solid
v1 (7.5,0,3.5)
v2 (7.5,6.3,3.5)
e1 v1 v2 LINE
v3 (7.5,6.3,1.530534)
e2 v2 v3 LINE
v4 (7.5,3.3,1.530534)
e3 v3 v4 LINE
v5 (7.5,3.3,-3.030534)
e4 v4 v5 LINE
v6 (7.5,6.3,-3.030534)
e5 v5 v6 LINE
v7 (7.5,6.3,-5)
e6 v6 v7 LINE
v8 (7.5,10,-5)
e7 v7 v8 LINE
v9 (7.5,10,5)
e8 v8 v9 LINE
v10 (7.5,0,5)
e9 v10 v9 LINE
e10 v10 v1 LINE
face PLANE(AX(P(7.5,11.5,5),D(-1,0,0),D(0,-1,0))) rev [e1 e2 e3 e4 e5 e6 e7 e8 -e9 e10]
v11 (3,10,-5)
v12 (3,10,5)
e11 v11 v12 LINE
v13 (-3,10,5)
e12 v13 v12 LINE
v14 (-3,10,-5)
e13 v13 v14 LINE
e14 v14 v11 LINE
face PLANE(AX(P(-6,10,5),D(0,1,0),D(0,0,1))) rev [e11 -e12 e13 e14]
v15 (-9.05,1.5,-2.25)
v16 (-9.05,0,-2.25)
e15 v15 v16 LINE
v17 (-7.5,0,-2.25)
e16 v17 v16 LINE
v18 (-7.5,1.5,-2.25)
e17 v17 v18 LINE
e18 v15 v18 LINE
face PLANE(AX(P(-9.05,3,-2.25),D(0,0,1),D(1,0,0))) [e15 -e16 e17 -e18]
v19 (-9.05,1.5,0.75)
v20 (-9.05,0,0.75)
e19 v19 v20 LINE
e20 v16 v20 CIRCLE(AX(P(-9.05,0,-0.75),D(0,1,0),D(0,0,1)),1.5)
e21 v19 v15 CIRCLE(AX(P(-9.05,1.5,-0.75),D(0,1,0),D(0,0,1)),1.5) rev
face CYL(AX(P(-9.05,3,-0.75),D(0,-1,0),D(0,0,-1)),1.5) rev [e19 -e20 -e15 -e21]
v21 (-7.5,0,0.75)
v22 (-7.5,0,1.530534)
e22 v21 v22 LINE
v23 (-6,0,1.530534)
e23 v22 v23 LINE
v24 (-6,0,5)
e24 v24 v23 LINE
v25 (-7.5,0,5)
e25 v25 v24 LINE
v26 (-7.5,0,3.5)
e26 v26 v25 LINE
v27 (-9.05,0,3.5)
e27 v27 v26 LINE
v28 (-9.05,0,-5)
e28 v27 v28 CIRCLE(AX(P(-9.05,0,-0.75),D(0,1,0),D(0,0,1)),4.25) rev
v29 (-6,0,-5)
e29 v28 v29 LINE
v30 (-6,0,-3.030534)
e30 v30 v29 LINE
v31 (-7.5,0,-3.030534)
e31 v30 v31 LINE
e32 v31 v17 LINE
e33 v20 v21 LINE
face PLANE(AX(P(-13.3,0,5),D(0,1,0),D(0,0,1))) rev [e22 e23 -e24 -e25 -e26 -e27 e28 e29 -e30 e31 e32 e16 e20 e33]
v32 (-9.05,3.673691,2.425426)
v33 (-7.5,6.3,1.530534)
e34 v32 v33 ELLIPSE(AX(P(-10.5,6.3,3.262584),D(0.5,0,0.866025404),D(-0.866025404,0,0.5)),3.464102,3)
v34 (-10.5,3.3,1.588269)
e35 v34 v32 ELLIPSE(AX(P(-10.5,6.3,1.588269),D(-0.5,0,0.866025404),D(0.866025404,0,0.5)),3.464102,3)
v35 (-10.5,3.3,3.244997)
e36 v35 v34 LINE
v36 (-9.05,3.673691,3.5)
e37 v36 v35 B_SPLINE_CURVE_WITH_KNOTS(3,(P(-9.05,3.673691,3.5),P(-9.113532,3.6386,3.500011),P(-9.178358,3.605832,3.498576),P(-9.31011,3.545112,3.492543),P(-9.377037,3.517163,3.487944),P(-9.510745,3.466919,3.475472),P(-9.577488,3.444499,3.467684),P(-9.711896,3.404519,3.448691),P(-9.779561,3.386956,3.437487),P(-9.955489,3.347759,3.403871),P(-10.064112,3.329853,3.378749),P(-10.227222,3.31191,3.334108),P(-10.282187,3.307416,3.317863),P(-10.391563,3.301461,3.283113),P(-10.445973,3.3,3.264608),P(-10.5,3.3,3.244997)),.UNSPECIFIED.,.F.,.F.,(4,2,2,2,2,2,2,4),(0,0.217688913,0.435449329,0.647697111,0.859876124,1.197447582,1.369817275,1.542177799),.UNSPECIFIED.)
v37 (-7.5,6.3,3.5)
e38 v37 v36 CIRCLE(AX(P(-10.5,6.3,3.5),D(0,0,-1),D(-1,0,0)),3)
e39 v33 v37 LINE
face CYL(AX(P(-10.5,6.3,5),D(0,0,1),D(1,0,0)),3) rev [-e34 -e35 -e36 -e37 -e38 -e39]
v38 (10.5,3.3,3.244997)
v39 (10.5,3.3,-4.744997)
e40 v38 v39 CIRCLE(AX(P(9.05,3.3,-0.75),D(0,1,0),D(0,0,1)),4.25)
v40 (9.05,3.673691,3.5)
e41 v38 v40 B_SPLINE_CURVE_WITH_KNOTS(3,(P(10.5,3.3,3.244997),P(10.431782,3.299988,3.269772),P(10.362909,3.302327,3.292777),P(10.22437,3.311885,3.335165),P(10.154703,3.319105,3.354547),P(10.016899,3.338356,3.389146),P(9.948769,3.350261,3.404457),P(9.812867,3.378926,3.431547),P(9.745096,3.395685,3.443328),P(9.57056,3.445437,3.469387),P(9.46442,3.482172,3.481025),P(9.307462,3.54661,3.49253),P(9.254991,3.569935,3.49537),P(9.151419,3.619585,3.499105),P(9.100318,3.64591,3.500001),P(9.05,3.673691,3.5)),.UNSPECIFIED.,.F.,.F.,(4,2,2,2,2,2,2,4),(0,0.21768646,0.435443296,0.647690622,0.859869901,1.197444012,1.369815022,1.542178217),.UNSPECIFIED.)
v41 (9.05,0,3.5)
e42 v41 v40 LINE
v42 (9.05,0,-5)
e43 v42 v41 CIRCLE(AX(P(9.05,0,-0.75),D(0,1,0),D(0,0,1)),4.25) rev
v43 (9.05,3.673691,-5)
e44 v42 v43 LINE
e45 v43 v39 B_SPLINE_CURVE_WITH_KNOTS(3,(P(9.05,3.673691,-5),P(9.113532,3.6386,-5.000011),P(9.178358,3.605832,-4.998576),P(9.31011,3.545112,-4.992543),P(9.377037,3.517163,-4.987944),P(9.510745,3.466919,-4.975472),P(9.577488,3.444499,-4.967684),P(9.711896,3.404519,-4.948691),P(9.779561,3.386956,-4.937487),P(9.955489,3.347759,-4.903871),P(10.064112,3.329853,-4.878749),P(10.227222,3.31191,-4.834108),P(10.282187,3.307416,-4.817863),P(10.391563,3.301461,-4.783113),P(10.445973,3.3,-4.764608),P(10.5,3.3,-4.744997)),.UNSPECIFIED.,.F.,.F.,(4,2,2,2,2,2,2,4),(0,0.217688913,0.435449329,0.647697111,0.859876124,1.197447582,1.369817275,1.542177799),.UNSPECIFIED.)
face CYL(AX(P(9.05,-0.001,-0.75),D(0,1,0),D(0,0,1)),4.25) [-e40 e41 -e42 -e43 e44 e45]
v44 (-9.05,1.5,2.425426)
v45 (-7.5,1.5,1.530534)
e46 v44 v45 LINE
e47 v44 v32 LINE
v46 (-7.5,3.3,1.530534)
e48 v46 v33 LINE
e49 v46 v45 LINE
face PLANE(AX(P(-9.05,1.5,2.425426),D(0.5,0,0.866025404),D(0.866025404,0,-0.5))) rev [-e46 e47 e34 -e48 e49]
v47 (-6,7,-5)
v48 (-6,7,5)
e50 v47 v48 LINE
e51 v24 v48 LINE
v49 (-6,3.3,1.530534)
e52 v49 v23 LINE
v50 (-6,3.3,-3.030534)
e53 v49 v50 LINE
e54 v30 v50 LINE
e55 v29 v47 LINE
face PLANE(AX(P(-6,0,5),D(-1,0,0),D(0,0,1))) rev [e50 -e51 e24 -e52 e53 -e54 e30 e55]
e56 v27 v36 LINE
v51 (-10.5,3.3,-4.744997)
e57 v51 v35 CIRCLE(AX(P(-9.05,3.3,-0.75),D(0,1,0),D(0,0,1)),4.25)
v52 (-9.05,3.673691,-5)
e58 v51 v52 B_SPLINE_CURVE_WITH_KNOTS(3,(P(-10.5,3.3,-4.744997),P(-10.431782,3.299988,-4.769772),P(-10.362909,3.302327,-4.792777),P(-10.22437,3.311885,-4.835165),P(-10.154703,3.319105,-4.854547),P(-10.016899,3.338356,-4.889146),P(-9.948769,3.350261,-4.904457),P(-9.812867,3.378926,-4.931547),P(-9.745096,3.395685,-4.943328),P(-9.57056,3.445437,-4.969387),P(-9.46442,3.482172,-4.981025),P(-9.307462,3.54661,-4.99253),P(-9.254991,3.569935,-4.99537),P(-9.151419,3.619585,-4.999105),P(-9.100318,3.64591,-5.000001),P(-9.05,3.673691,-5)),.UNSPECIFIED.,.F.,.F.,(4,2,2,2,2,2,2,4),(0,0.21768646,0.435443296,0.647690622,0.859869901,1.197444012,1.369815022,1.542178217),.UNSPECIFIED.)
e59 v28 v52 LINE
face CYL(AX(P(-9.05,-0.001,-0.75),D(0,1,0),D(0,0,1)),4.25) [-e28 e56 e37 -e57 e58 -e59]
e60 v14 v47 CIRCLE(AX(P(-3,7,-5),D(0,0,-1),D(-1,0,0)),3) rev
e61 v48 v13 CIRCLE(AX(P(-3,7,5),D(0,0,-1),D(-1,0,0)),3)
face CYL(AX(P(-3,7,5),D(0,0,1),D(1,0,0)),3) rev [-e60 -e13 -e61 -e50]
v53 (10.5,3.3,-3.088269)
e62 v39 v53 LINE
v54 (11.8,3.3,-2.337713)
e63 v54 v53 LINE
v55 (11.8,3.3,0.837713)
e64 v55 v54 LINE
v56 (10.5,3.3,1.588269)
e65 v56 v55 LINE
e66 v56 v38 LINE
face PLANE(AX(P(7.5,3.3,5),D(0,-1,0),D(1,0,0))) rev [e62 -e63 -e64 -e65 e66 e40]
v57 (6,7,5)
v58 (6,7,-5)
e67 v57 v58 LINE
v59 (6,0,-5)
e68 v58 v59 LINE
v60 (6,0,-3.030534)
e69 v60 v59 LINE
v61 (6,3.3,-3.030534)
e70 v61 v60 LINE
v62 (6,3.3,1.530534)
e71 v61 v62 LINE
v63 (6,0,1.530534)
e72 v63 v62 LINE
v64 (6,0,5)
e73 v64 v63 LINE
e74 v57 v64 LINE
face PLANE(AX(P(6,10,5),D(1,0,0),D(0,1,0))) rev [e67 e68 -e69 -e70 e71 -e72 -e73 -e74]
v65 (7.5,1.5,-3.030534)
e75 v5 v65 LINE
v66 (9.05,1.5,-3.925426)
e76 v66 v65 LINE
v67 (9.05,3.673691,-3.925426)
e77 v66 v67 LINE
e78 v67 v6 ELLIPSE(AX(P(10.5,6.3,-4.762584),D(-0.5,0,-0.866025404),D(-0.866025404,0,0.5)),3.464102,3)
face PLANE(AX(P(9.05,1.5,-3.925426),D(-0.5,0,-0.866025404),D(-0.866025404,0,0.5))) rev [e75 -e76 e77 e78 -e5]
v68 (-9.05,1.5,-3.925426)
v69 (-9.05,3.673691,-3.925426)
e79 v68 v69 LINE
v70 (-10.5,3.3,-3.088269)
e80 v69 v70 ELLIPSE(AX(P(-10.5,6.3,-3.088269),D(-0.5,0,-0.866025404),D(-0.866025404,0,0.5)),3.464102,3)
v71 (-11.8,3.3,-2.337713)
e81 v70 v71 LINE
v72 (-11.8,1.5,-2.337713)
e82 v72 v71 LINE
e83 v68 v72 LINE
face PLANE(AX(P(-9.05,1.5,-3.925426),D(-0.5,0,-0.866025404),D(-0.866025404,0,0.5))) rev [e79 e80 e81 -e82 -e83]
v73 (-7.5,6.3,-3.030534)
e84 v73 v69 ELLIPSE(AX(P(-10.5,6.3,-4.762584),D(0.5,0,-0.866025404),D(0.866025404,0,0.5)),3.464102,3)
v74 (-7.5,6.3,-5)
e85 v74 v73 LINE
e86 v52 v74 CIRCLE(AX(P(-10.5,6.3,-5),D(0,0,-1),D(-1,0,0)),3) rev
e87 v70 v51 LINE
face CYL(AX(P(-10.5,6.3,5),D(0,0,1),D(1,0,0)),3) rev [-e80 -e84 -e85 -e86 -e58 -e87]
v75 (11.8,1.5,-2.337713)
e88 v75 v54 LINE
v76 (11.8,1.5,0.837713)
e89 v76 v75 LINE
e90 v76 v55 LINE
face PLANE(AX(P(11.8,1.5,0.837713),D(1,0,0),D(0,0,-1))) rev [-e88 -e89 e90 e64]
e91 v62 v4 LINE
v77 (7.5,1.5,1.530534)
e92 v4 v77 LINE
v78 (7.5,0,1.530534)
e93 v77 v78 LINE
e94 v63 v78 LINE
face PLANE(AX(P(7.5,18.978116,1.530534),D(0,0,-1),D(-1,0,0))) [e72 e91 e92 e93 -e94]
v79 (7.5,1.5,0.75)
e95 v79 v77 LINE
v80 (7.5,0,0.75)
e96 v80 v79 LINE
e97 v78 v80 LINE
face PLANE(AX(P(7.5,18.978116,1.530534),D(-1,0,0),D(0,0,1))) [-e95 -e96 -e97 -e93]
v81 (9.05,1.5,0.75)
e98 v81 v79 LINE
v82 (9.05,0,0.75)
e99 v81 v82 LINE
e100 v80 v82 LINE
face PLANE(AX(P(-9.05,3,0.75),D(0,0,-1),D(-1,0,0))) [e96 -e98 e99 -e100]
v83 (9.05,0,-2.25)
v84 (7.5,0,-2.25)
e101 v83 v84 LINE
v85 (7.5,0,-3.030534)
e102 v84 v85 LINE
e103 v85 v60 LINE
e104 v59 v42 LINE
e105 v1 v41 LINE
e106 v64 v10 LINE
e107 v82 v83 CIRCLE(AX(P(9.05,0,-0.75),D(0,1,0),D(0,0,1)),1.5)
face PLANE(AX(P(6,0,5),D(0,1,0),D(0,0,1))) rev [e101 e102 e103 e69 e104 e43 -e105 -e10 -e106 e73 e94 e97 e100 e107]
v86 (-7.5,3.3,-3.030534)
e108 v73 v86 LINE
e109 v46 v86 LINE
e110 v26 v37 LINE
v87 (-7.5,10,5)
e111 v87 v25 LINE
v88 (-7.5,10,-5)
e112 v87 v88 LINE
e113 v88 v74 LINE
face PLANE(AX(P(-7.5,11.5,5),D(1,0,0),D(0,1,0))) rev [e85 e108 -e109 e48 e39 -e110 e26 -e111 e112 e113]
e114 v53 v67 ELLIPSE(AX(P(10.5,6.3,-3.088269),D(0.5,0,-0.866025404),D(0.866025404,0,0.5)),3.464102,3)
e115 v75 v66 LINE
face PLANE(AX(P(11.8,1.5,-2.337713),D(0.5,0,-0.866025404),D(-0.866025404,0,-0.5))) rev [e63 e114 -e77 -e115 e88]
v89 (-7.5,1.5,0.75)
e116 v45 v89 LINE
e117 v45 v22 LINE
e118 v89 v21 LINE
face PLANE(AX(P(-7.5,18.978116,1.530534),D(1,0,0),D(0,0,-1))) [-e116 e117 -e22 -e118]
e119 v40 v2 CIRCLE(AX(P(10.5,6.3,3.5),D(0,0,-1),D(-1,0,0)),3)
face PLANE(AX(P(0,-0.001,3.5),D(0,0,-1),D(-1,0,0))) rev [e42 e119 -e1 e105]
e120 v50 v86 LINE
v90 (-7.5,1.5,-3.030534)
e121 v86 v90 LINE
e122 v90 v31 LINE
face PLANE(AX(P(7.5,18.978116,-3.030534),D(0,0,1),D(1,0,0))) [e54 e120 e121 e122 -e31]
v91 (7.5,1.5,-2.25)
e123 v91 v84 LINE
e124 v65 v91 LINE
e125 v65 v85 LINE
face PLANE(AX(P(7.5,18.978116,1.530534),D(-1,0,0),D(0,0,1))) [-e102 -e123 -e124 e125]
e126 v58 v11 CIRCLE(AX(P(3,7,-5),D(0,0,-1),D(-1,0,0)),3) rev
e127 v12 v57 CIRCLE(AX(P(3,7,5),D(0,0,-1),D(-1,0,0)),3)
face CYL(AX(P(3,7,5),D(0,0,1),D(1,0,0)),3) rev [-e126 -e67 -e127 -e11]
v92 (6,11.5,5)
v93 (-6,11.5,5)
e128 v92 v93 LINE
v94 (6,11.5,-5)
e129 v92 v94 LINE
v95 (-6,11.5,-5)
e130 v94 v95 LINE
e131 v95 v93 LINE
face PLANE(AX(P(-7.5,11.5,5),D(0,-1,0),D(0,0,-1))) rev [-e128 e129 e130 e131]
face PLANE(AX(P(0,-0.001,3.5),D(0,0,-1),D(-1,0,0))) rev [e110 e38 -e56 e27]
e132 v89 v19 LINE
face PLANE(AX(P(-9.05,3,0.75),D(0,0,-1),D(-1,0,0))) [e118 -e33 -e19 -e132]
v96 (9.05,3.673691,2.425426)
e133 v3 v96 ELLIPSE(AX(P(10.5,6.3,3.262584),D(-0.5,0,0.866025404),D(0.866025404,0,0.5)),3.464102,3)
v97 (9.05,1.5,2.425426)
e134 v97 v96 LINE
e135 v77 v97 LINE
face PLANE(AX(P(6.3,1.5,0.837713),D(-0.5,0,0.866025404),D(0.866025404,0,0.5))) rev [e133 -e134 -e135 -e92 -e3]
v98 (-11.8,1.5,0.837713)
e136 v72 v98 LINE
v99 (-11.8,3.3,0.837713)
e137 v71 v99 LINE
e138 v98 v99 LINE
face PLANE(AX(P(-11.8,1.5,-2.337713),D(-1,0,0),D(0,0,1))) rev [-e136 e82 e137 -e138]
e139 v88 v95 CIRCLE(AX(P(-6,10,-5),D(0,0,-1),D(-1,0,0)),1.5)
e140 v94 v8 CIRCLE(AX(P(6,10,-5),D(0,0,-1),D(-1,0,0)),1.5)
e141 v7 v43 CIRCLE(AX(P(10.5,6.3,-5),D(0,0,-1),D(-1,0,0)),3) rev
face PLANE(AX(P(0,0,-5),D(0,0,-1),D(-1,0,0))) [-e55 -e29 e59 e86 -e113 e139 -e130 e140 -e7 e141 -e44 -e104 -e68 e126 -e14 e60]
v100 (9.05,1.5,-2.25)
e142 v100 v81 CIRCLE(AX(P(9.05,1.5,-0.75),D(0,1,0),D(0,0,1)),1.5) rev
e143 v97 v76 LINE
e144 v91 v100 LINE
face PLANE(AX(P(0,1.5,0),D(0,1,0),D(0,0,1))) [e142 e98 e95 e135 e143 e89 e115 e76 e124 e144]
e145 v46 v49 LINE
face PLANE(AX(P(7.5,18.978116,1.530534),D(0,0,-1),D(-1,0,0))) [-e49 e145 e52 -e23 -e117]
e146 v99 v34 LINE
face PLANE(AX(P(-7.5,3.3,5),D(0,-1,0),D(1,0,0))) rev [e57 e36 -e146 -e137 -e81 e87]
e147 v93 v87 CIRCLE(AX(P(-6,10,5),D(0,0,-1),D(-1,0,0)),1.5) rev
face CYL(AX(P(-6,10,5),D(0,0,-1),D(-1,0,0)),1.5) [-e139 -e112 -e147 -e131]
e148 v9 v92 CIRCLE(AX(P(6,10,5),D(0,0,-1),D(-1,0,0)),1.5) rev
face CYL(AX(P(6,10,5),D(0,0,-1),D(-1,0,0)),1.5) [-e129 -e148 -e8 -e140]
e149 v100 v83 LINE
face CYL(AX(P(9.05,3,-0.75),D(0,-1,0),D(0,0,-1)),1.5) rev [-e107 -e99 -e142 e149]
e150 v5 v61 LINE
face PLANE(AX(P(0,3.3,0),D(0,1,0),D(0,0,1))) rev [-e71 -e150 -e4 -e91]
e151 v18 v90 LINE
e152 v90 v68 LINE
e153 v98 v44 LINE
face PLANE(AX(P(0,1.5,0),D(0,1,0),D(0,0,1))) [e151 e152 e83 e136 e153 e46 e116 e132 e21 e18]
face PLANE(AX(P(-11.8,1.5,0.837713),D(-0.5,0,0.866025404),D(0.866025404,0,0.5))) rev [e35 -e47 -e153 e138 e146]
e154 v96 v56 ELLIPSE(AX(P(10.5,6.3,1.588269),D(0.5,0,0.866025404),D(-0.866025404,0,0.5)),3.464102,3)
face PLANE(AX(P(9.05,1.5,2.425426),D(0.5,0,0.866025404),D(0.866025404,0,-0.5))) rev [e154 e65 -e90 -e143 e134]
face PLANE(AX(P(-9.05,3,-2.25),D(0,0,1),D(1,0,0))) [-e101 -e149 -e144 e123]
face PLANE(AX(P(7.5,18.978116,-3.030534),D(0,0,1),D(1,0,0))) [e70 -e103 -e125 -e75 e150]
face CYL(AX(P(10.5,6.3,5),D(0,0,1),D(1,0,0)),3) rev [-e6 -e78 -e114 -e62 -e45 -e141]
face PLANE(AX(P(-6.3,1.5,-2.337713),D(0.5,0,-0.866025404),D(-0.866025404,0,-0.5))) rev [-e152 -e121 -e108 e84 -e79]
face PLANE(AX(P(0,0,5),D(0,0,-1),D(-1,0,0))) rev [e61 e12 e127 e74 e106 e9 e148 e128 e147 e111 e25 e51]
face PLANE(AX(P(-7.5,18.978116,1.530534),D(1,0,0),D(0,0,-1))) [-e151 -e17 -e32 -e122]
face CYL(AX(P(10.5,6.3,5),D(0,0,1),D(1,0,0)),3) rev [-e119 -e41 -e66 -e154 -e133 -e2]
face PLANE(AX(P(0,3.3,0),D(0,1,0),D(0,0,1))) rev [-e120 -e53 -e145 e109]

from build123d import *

# Parameters (mm, degrees)
BOSS_EXTRUDE1_DEPTH = 5
CUT_EXTRUDE1_REACH  = 18.405
CUT_EXTRUDE2_DEPTH  = 1.8
FILLET1_START       = -5
FILLET1_DEPTH       = 10
FILLET1_2_DEPTH     = 1.969466537
FILLET1_START_2     = 1.530533463
FILLET1_3_DEPTH     = 1.969466537
FILLET1_START_3     = 3.3
FILLET1_4_DEPTH     = 3.7
FILLET2_R           = 1.5
CUT_EXTRUDE3_DEPTH  = 3
CUT_EXTRUDE4_REACH  = 20.279
SKETCH5_W           = 15
SKETCH5_H           = 4.561067126


with BuildPart() as part:
    # Sketch1 → Boss-Extrude1 (new, symmetric)
    with BuildSketch(Plane.XY):
        Polygon((-7.5, 11.5), (7.5, 11.5), (7.5, 3.3), (13.3, 3.3), (13.3, 0), (6, 0), (6, 10), (-6, 10), (-6, 0), (-13.3, 0), (-13.3, 3.3), (-7.5, 3.3), align=None)
    extrude(amount=BOSS_EXTRUDE1_DEPTH, both=True)

    # Sketch2 → Cut-Extrude1 (cut, up to next)
    with BuildSketch(Plane(origin=(0, 3.3, 0), x_dir=(1, 0, 0), z_dir=(0, 1, 0)), mode=Mode.PRIVATE) as cut_extrude1_sk1:
        with BuildLine():
            ThreePointArc((-9.05, -3.5), (-12.05520382, -2.25520382), (-13.3, 0.75))
            Line((-13.3, 0.75), (-13.3, -5))
            Line((-13.3, -5), (-7.5, -5))
            Line((-7.5, -5), (-7.5, -3.5))
            Line((-7.5, -3.5), (-9.05, -3.5))
        make_face()
    cut_extrude1_tool1 = extrude(cut_extrude1_sk1.sketch, amount=-CUT_EXTRUDE1_REACH, mode=Mode.PRIVATE) & part.part
    # Sketch2 → Cut-Extrude1 (cut, up to next)
    with BuildSketch(Plane(origin=(0, 3.3, 0), x_dir=(1, 0, 0), z_dir=(0, 1, 0)), mode=Mode.PRIVATE) as cut_extrude1_sk2:
        with BuildLine():
            ThreePointArc((-13.3, 0.75), (-12.05520382, 3.75520382), (-9.05, 5))
            Line((-9.05, 5), (-13.3, 5))
            Line((-13.3, 5), (-13.3, 0.75))
        make_face()
    cut_extrude1_tool2 = extrude(cut_extrude1_sk2.sketch, amount=-CUT_EXTRUDE1_REACH, mode=Mode.PRIVATE) & part.part
    # Sketch2 → Cut-Extrude1 (cut, up to next)
    with BuildSketch(Plane(origin=(0, 3.3, 0), x_dir=(1, 0, 0), z_dir=(0, 1, 0)), mode=Mode.PRIVATE) as cut_extrude1_sk3:
        with BuildLine():
            ThreePointArc((9.05, 5), (12.05520382, 3.75520382), (13.3, 0.75))
            Line((13.3, 0.75), (13.3, 5))
            Line((13.3, 5), (9.05, 5))
        make_face()
    cut_extrude1_tool3 = extrude(cut_extrude1_sk3.sketch, amount=-CUT_EXTRUDE1_REACH, mode=Mode.PRIVATE) & part.part
    # Sketch2 → Cut-Extrude1 (cut, up to next)
    with BuildSketch(Plane(origin=(0, 3.3, 0), x_dir=(1, 0, 0), z_dir=(0, 1, 0)), mode=Mode.PRIVATE) as cut_extrude1_sk4:
        with BuildLine():
            ThreePointArc((13.3, 0.75), (12.05520382, -2.25520382), (9.05, -3.5))
            Line((9.05, -3.5), (7.5, -3.5))
            Line((7.5, -3.5), (7.5, -5))
            Line((7.5, -5), (13.3, -5))
            Line((13.3, -5), (13.3, 0.75))
        make_face()
    cut_extrude1_tool4 = extrude(cut_extrude1_sk4.sketch, amount=-CUT_EXTRUDE1_REACH, mode=Mode.PRIVATE) & part.part
    add(cut_extrude1_tool1.solids().sort_by_distance((-11.00124, 3.3, 3.726238))[0], mode=Mode.SUBTRACT)
    add(cut_extrude1_tool2.solids().sort_by_distance((-12.350686, 3.3, -4.050686))[0], mode=Mode.SUBTRACT)
    add(cut_extrude1_tool3.solids().sort_by_distance((12.350686, 3.3, -4.050686))[0], mode=Mode.SUBTRACT)
    add(cut_extrude1_tool4.solids().sort_by_distance((11.00124, 3.3, 3.726238))[0], mode=Mode.SUBTRACT)

    # Sketch3 → Cut-Extrude2 (cut)
    with BuildSketch(Plane(origin=(0, 3.3, 0), x_dir=(1, 0, 0), z_dir=(0, 1, 0))):
        Polygon((-9.05, 3.925426481), (-11.8, 2.33771324), (-11.8, -0.83771324), (-9.05, -2.425426481), (-6.3, -0.83771324), (-6.3, 2.33771324), align=None)
        Polygon((9.05, 3.925426481), (6.3, 2.33771324), (6.3, -0.83771324), (9.05, -2.425426481), (11.8, -0.83771324), (11.8, 2.33771324), align=None)
    extrude(amount=-CUT_EXTRUDE2_DEPTH, mode=Mode.SUBTRACT)

    # Fillet1: read off the stored shape, not the designer's step
    # Fillet1 outline → Fillet1 (add)
    with BuildSketch(Plane.XY.offset(FILLET1_START)):
        with BuildLine():
            ThreePointArc((-6, 7), (-5.121320344, 9.121320344), (-3, 10))
            Line((-3, 10), (-6, 10))
            Line((-6, 10), (-6, 7))
        make_face()
        with BuildLine():
            ThreePointArc((3, 10), (5.121320344, 9.121320344), (6, 7))
            Line((6, 7), (6, 10))
            Line((6, 10), (3, 10))
        make_face()
    extrude(amount=FILLET1_DEPTH)

    # Fillet1 2 outline → Fillet1 2 (add)
    with BuildSketch(Plane.XY.offset(FILLET1_START)):
        with BuildLine():
            ThreePointArc((-7.5, 6.3), (-8.378679656, 4.178679656), (-10.5, 3.3))
            Line((-10.5, 3.3), (-7.5, 3.3))
            Line((-7.5, 3.3), (-7.5, 6.3))
        make_face()
        with BuildLine():
            ThreePointArc((10.5, 3.3), (8.378679656, 4.178679656), (7.5, 6.3))
            Line((7.5, 6.3), (7.5, 3.3))
            Line((7.5, 3.3), (10.5, 3.3))
        make_face()
    extrude(amount=FILLET1_2_DEPTH)

    # Fillet1 3 outline → Fillet1 3 (add)
    with BuildSketch(Plane.XY.offset(FILLET1_START_2)):
        with BuildLine():
            ThreePointArc((-7.5, 6.3), (-8.378679656, 4.178679656), (-10.5, 3.3))
            Line((-10.5, 3.3), (-7.5, 3.3))
            Line((-7.5, 3.3), (-7.5, 6.3))
        make_face()
        with BuildLine():
            ThreePointArc((10.5, 3.3), (8.378679656, 4.178679656), (7.5, 6.3))
            Line((7.5, 6.3), (7.5, 3.3))
            Line((7.5, 3.3), (10.5, 3.3))
        make_face()
    extrude(amount=FILLET1_3_DEPTH)

    # Fillet1 4 outline → Fillet1 4 (cut)
    with BuildSketch(Plane(origin=(0, 0, 0), x_dir=(1, 0, 0), z_dir=(0, 1, 0)).offset(FILLET1_START_3)):
        with BuildLine():
            ThreePointArc((10.5, -3.244996871), (9.786126109, -3.435763772), (9.05, -3.5))
            Line((9.05, -3.5), (10.5, -3.5))
            Line((10.5, -3.5), (10.5, -3.244996871))
        make_face()
        Polygon((9.05, 3.925426481), (7.5, 3.030533563), (10.5, 3.030533463), (10.5, 3.08826859), align=None)
        Polygon((10.5, -1.530533463), (7.5, -1.530533463), (9.05, -2.425426481), (10.5, -1.58826859), align=None)
        with BuildLine():
            Line((10.5, 5), (9.05, 5))
            ThreePointArc((9.05, 5), (9.786126109, 4.935763772), (10.5, 4.744996871))
            Line((10.5, 4.744996871), (10.5, 5))
        make_face()
        with BuildLine():
            ThreePointArc((-9.05, -3.5), (-9.786126109, -3.435763772), (-10.5, -3.244996871))
            Line((-10.5, -3.244996871), (-10.5, -3.5))
            Line((-10.5, -3.5), (-9.05, -3.5))
        make_face()
        Polygon((-9.05, 3.925426481), (-10.5, 3.08826859), (-10.5, 3.030533463), (-7.5, 3.030533463), align=None)
        Polygon((-7.5, -1.530533463), (-10.5, -1.530533463), (-10.5, -1.58826859), (-9.05, -2.425426481), align=None)
        with BuildLine():
            Line((-9.05, 5), (-10.5, 5))
            Line((-10.5, 5), (-10.5, 4.744996871))
            ThreePointArc((-10.5, 4.744996871), (-9.786126109, 4.935763772), (-9.05, 5))
        make_face()
    extrude(amount=FILLET1_4_DEPTH, mode=Mode.SUBTRACT)

    # Fillet2
    fillet2_edges = [part.edges().sort_by_distance(p)[0] for p in [
        (-7.5, 11.5, 0),
        (7.5, 11.5, 0),
    ]]
    fillet(fillet2_edges, radius=FILLET2_R)

    # Sketch4 → Cut-Extrude3 (cut)
    with BuildSketch(Plane(origin=(0, 0, 0), x_dir=(1, 0, 0), z_dir=(0, 1, 0))):
        with BuildLine():
            Line((-9.05, -0.75), (9.05, -0.75))
            ThreePointArc((9.05, -0.75), (10.55, 0.75), (9.05, 2.25))
            Line((9.05, 2.25), (-9.05, 2.25))
            ThreePointArc((-9.05, 2.25), (-10.55, 0.75), (-9.05, -0.75))
        make_face()
    extrude(amount=CUT_EXTRUDE3_DEPTH, mode=Mode.SUBTRACT)

    # Cut-Extrude4: up to this face of the body (flat: up to its plane)
    cut_extrude4_end = Plane(part.part.faces().sort_by_distance((6.935820896, 3.3, -0.75))[0])
    # Sketch5 → Cut-Extrude4 (cut, up to the picked face)
    with BuildSketch(Plane(origin=(0, 0, 0), x_dir=(1, 0, 0), z_dir=(0, 1, 0)), mode=Mode.PRIVATE) as cut_extrude4_sk1:
        with Locations((0, 0.75)):
            Rectangle(SKETCH5_W, SKETCH5_H)
    cut_extrude4_tool1 = split(extrude(cut_extrude4_sk1.sketch, amount=CUT_EXTRUDE4_REACH, mode=Mode.PRIVATE), bisect_by=cut_extrude4_end, keep=Keep.BOTH, mode=Mode.PRIVATE)
    add(cut_extrude4_tool1.solids().sort_by(Axis((0, 0, -0.75), (0, 1, 0)))[0], mode=Mode.SUBTRACT)


solid = part.part
